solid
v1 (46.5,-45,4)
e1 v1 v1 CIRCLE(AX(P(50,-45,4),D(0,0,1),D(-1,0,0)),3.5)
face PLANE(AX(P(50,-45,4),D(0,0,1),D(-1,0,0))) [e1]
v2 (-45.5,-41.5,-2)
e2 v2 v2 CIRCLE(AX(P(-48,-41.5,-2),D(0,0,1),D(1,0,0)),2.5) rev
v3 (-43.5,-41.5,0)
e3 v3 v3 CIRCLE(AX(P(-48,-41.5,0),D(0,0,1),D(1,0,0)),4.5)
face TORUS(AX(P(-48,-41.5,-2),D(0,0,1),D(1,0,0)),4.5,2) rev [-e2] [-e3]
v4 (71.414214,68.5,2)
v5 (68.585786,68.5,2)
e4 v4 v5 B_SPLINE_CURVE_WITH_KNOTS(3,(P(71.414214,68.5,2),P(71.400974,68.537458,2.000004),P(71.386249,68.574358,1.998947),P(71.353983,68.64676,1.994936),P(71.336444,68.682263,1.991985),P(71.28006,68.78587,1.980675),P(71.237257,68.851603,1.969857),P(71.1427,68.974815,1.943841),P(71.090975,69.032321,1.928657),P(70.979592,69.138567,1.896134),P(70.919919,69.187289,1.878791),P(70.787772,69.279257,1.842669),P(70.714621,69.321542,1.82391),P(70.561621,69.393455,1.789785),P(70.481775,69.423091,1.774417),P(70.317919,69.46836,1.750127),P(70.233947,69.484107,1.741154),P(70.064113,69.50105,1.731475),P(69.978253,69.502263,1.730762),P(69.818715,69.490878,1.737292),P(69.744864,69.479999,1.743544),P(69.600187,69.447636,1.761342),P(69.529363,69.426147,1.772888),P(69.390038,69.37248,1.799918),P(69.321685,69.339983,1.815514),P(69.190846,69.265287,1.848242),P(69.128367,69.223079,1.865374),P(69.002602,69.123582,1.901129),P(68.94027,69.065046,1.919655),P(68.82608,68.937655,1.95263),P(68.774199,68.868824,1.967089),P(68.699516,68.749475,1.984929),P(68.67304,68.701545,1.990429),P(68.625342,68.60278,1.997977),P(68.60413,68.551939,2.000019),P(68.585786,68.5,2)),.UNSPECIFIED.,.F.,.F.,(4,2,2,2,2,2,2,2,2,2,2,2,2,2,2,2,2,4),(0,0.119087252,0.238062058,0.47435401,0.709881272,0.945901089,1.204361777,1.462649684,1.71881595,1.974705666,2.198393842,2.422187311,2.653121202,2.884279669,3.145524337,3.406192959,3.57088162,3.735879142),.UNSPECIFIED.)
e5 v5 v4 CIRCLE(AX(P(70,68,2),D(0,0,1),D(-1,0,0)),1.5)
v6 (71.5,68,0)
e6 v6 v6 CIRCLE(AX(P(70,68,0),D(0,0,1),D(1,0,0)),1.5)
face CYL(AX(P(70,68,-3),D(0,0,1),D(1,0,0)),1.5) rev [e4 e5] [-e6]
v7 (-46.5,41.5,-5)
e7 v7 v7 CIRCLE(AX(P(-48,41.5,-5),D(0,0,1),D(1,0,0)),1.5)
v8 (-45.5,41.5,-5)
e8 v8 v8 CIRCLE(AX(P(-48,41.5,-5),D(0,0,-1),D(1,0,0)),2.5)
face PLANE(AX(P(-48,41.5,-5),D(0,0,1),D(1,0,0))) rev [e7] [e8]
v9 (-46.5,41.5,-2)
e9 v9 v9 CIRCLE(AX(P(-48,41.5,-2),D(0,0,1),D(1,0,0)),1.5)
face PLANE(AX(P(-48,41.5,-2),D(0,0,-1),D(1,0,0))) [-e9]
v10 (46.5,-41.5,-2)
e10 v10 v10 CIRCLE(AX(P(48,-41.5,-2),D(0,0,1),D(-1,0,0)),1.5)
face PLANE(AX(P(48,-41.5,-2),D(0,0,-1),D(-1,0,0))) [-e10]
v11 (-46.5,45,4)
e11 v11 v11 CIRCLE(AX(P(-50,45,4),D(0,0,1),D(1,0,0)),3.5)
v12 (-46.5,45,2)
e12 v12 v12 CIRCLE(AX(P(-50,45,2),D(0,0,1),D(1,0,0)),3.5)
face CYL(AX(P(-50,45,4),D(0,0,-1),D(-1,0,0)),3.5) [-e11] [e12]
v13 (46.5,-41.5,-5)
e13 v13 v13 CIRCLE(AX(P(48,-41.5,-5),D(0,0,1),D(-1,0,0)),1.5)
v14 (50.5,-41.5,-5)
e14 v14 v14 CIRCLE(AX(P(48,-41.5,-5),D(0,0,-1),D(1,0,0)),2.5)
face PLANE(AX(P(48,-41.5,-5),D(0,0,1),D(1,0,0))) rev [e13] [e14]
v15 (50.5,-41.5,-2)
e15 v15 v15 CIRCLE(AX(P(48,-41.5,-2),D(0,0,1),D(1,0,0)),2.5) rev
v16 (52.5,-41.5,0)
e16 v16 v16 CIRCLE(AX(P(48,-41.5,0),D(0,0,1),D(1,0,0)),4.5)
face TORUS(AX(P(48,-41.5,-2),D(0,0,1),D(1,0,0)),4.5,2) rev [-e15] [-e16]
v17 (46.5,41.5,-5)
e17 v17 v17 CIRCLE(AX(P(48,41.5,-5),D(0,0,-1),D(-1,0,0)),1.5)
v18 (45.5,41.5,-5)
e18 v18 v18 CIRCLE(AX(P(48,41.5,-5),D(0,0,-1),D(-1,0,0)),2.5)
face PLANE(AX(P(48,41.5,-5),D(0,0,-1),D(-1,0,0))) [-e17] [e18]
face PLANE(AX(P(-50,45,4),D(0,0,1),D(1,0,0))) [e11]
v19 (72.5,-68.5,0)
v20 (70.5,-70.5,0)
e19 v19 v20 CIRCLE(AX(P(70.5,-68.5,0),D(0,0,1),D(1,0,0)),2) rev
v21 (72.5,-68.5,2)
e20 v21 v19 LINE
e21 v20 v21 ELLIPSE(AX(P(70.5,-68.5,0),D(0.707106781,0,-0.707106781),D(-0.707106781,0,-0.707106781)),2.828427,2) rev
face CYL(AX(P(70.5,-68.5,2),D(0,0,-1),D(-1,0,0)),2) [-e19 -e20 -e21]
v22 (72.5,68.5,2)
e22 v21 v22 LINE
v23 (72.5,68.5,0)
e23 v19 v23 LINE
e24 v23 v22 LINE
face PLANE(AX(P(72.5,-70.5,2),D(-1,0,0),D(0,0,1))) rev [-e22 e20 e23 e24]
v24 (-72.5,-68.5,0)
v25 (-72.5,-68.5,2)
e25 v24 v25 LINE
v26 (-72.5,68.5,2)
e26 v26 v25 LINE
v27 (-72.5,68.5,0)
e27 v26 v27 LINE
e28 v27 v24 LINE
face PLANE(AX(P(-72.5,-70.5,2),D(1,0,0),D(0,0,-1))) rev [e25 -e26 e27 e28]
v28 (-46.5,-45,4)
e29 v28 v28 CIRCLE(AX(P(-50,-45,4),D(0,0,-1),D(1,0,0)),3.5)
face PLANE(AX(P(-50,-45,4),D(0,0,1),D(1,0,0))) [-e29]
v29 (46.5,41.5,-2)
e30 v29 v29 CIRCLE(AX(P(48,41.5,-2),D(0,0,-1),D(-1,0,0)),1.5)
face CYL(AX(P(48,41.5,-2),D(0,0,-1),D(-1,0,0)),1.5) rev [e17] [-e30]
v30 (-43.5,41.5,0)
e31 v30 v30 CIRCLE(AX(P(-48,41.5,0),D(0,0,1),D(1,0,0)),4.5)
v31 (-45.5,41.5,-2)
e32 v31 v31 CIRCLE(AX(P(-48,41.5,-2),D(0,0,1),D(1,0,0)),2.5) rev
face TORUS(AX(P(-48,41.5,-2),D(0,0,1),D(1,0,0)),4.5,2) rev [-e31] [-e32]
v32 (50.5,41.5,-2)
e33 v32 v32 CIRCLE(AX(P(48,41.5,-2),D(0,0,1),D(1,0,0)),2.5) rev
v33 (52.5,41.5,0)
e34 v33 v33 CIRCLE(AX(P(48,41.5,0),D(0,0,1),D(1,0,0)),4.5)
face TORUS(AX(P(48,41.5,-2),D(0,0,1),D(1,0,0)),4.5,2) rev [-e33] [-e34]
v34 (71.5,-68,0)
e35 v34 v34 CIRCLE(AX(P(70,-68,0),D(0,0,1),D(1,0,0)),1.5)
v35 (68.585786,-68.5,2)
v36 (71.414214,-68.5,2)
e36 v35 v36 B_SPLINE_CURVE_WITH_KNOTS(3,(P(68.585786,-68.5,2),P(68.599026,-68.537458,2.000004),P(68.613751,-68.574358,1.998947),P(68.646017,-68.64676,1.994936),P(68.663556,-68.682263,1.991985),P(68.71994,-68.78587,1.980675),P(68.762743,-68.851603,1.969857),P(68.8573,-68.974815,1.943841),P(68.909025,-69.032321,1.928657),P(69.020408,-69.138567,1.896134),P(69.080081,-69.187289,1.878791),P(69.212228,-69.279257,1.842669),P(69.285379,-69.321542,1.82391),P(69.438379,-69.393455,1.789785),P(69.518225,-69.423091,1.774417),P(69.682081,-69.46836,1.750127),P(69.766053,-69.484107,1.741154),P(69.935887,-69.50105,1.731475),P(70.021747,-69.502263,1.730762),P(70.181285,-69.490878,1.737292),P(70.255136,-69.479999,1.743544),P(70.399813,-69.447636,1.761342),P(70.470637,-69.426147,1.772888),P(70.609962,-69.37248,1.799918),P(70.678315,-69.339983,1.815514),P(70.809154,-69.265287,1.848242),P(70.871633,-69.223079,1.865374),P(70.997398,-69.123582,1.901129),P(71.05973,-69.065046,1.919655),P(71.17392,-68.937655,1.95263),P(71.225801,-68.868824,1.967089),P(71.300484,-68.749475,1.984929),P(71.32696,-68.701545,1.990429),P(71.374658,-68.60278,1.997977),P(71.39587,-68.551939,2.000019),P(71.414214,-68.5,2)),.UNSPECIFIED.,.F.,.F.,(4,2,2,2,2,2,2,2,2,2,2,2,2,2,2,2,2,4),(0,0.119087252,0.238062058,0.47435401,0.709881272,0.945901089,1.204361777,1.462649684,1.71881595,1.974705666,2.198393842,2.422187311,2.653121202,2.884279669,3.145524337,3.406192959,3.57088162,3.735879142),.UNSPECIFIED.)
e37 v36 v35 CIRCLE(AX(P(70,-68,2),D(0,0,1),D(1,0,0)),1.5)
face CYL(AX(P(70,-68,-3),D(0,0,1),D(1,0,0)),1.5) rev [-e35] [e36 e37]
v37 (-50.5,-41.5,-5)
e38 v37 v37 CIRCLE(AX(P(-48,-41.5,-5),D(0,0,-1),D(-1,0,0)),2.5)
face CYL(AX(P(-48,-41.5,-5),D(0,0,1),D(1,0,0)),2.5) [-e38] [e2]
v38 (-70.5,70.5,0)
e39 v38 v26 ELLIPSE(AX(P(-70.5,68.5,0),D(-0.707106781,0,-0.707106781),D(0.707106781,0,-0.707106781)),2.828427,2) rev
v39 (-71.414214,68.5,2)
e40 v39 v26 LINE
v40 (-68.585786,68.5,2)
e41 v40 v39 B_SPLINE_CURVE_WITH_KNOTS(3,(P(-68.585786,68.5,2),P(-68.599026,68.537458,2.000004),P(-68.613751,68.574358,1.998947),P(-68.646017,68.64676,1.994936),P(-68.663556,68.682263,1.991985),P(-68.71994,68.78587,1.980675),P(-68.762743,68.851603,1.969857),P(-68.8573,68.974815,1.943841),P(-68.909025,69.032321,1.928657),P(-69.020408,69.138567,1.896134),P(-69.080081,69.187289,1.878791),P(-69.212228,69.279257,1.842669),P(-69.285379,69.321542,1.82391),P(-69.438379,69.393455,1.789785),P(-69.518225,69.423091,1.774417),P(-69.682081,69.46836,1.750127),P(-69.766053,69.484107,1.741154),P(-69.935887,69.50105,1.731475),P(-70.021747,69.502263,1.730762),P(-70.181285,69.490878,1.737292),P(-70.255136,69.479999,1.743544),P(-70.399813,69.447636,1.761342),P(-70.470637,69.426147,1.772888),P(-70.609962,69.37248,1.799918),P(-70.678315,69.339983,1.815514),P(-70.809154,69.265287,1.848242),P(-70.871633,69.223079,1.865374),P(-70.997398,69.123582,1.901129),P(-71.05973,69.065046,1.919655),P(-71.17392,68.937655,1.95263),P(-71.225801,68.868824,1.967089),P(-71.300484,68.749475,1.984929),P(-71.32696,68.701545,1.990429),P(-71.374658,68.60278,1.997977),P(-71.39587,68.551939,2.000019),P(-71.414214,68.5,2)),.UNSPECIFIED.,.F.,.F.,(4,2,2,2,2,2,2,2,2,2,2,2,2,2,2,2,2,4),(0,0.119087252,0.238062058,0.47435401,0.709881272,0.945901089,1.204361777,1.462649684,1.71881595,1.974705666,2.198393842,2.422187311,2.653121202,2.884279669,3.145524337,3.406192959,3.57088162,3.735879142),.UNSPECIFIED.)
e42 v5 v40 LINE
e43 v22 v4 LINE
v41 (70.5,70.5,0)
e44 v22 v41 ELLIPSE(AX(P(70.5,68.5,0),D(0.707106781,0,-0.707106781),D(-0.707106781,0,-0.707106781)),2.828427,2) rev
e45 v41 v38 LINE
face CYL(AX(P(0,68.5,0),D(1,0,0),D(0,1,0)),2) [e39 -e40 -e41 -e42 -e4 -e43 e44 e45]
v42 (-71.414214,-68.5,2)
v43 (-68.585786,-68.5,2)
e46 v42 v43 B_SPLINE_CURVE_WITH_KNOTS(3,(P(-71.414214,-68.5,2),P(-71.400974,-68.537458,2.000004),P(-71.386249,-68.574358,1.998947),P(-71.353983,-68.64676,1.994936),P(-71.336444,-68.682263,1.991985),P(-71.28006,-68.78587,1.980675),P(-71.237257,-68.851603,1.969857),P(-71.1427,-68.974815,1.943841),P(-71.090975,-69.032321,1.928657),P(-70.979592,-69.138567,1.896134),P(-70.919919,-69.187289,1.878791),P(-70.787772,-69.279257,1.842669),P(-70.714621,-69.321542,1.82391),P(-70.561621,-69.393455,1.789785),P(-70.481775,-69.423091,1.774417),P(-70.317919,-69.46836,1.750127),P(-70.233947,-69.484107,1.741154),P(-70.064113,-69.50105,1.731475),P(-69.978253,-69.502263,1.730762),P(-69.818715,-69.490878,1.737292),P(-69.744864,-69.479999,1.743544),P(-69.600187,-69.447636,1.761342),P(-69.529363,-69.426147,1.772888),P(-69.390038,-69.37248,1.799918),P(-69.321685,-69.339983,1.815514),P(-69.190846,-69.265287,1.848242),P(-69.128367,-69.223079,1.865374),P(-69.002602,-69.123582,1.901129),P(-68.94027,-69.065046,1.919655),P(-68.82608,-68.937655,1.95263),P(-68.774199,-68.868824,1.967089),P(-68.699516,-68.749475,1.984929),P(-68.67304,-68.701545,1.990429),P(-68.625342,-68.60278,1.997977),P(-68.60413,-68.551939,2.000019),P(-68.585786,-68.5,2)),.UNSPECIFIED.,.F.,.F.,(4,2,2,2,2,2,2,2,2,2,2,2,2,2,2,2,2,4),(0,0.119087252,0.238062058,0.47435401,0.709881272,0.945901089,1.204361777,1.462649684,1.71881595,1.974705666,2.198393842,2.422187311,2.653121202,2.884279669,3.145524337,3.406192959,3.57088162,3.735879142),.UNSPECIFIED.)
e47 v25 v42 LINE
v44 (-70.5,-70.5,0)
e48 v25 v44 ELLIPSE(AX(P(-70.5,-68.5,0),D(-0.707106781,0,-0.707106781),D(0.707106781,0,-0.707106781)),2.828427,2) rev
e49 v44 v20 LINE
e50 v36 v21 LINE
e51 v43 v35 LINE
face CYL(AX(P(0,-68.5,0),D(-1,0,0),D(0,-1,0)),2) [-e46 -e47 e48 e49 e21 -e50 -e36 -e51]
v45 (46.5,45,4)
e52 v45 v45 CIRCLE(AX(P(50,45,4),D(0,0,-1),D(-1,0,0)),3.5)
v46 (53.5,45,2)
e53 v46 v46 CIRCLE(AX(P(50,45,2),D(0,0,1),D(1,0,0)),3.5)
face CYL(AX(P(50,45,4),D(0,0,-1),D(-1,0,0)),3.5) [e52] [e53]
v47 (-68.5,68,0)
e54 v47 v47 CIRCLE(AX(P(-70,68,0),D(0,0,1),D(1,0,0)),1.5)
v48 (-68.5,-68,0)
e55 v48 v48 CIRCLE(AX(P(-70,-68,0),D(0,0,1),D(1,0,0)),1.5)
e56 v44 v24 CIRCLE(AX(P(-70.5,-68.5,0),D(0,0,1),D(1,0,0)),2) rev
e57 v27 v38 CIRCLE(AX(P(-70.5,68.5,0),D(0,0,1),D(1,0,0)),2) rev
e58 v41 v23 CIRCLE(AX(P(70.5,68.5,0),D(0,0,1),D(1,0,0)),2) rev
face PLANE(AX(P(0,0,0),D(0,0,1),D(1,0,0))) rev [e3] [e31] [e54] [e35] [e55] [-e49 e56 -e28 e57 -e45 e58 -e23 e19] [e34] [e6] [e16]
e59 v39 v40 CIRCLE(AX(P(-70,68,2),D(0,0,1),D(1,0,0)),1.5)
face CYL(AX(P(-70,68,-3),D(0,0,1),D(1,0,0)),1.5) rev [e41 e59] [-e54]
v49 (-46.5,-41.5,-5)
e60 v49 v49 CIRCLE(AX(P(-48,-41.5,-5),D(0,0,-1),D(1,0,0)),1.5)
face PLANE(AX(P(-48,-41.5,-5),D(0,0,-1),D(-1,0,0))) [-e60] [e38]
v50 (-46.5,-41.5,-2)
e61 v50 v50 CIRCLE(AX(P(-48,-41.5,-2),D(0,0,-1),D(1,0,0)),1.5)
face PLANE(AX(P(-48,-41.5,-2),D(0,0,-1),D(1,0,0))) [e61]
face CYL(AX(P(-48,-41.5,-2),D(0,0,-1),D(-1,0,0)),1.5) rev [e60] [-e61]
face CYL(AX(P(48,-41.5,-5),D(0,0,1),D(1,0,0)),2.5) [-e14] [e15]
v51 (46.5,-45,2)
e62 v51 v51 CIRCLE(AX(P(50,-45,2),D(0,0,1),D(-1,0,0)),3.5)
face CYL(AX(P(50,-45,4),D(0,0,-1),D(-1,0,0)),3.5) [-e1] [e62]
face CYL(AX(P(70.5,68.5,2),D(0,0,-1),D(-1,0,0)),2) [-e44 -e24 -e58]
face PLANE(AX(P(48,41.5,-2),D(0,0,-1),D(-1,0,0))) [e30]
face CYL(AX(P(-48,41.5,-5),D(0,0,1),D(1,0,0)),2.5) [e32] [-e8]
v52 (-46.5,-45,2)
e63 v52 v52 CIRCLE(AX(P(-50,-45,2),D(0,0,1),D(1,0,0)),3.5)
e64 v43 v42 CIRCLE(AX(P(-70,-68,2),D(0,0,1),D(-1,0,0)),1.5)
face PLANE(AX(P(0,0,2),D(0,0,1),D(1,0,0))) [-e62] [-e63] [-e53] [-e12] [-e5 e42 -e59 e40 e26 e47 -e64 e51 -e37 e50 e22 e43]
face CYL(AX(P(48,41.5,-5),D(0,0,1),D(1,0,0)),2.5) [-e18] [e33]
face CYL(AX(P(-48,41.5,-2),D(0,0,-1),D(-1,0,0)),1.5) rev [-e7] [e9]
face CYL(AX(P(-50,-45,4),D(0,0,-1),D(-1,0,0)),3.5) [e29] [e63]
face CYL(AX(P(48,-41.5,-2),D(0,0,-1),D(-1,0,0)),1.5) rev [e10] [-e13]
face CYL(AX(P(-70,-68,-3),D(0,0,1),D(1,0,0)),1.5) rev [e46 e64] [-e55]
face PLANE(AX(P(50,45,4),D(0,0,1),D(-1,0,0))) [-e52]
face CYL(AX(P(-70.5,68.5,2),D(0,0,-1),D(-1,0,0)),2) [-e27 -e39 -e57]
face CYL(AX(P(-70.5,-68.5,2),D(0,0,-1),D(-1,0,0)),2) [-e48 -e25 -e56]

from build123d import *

# Parameters (mm, degrees)
SKETCH1_W                                  = 145
SKETCH1_H                                  = 141
BOSS_EXTRUDE1_DEPTH                        = 2
SKETCH2_R                                  = 1.5
CUT_EXTRUDE1_DEPTH                         = 5
FILLET1_R                                  = 2
SKETCH3_R                                  = 2.5
BOSS_EXTRUDE2_DEPTH                        = 5
FILLET2_R                                  = 2
SKETCH4_R                                  = 1.5
CUT_EXTRUDE2_DEPTH                         = 3
MIRROR1_AT_THE_SECOND_PLANE_COPY_1_SKETC_R = 1.5
MIRROR1_AT_THE_SECOND_PLANE_COPY_1_DEPTH   = 3
SKETCH5_R                                  = 3.5
BOSS_EXTRUDE3_DEPTH                        = 2
MIRROR2_AT_THE_SECOND_PLANE_COPY_1_SKETC_R = 3.5
MIRROR2_AT_THE_SECOND_PLANE_COPY_1_DEPTH   = 2


with BuildPart() as part:
    # Sketch1 → Boss-Extrude1 (new body)
    with BuildSketch(Plane.XY):
        Rectangle(SKETCH1_W, SKETCH1_H)
    extrude(amount=BOSS_EXTRUDE1_DEPTH)

    # Sketch2 → Cut-Extrude1 (cut)
    with BuildSketch(Plane.XY.offset(2)):
        with Locations((-70, 68)):
            Circle(SKETCH2_R)
        with Locations((-70, -68)):
            Circle(SKETCH2_R)
        with Locations((70, -68)):
            Circle(SKETCH2_R)
        with Locations((70, 68)):
            Circle(SKETCH2_R)
    extrude(amount=-CUT_EXTRUDE1_DEPTH, mode=Mode.SUBTRACT)

    # Fillet1
    # the kernel refuses this fillet: 2 mm, written as the material it takes off along each edge
    with BuildSketch(Plane(origin=(-77.5, 70.5, 2), x_dir=(0, -1, 0), z_dir=(1, 0, 0))) as fillet1_piece_1:
        with BuildLine():
            CenterArc((FILLET1_R, FILLET1_R), FILLET1_R, 180, 90)
            Line((0, FILLET1_R), (0, 0))
            Line((0, 0), (FILLET1_R, 0))
        make_face()
    extrude(amount=155, mode=Mode.SUBTRACT)
    with BuildSketch(Plane(origin=(-72.5, 70.5, -5), x_dir=(0, -1, 0), z_dir=(0, 0, 1)), Plane(origin=(-72.5, -70.5, -5), x_dir=(1, 0, 0), z_dir=(0, 0, 1))) as fillet1_piece_2:
        with BuildLine():
            CenterArc((FILLET1_R, FILLET1_R), FILLET1_R, 180, 90)
            Line((0, FILLET1_R), (0, 0))
            Line((0, 0), (FILLET1_R, 0))
        make_face()
    extrude(amount=12, mode=Mode.SUBTRACT)
    with BuildSketch(Plane(origin=(72.5, 70.5, -5), x_dir=(0, -1, 0), z_dir=(0, 0, 1)), Plane(origin=(72.5, -70.5, -5), x_dir=(-1, 0, 0), z_dir=(0, 0, 1))) as fillet1_piece_3:
        with BuildLine():
            CenterArc((FILLET1_R, -FILLET1_R), FILLET1_R, 90, 90)
            Line((0, -FILLET1_R), (0, 0))
            Line((0, 0), (FILLET1_R, 0))
        make_face()
    extrude(amount=12, mode=Mode.SUBTRACT)
    with BuildSketch(Plane(origin=(77.5, -70.5, 2), x_dir=(0, 0, -1), z_dir=(-1, 0, 0))) as fillet1_piece_4:
        with BuildLine():
            CenterArc((FILLET1_R, -FILLET1_R), FILLET1_R, 90, 90)
            Line((0, -FILLET1_R), (0, 0))
            Line((0, 0), (FILLET1_R, 0))
        make_face()
    extrude(amount=155, mode=Mode.SUBTRACT)

    # Sketch3 → Boss-Extrude2 (add)
    with BuildSketch(Plane(origin=(0, 0, 0), x_dir=(-1, 0, 0), z_dir=(0, 0, -1))):
        with Locations(Location((-48, 41.5, 0), (0, 0, 180))):
            Circle(SKETCH3_R)
        with Locations(Location((-48, -41.5, 0), (0, 0, 180))):
            Circle(SKETCH3_R)
        with Locations(Location((48, -41.5, 0), (0, 0, 180))):
            Circle(SKETCH3_R)
        with Locations(Location((48, 41.5, 0), (0, 0, 180))):
            Circle(SKETCH3_R)
    extrude(amount=BOSS_EXTRUDE2_DEPTH)

    # Fillet2
    fillet2_edges = [part.edges().sort_by_distance(p)[0] for p in [
        (45.5, 41.5, 0),
        (45.5, -41.5, 0),
        (-50.5, -41.5, 0),
        (-50.5, 41.5, 0),
    ]]
    fillet(fillet2_edges, radius=FILLET2_R)

    # Sketch4 → Cut-Extrude2 (cut)
    with BuildSketch(Plane(origin=(0, 0, -5), x_dir=(-1, 0, 0), z_dir=(0, 0, -1))):
        with Locations((-48, 41.5)):
            Circle(SKETCH4_R)
    cut_extrude2 = extrude(amount=-CUT_EXTRUDE2_DEPTH, mode=Mode.SUBTRACT)

    # Mirror1: Cut-Extrude2 across plane
    add(cut_extrude2.mirror(Plane(origin=(0, 0, 0), x_dir=(0, 0, 1), z_dir=(1, 0, 0))), mode=Mode.SUBTRACT)

    # Mirror1 at the second plane: Cut-Extrude2 across plane
    add(cut_extrude2.mirror(Plane.ZX), mode=Mode.SUBTRACT)

    # Mirror1 at the second plane copy 1 sketc → Mirror1 at the second plane copy 1 (cut)
    with BuildSketch(Plane(origin=(0, 0, -5), x_dir=(1, 0, 0), z_dir=(0, 0, -1))):
        with Locations((-48, 41.5)):
            Circle(MIRROR1_AT_THE_SECOND_PLANE_COPY_1_SKETC_R)
    extrude(amount=-MIRROR1_AT_THE_SECOND_PLANE_COPY_1_DEPTH, mode=Mode.SUBTRACT)

    # Sketch5 → Boss-Extrude3 (add)
    with BuildSketch(Plane.XY.offset(2)):
        with Locations((-50, 45)):
            Circle(SKETCH5_R)
    boss_extrude3 = extrude(amount=BOSS_EXTRUDE3_DEPTH)

    # Mirror2: Boss-Extrude3 across plane
    add(boss_extrude3.mirror(Plane(origin=(0, 0, 0), x_dir=(0, 0, 1), z_dir=(1, 0, 0))))

    # Mirror2 at the second plane: Boss-Extrude3 across plane
    add(boss_extrude3.mirror(Plane.ZX))

    # Mirror2 at the second plane copy 1 sketc → Mirror2 at the second plane copy 1 (add)
    with BuildSketch(Plane(origin=(0, 0, 2), x_dir=(-1, 0, 0), z_dir=(0, 0, 1))):
        with Locations((-50, 45)):
            Circle(MIRROR2_AT_THE_SECOND_PLANE_COPY_1_SKETC_R)
    extrude(amount=MIRROR2_AT_THE_SECOND_PLANE_COPY_1_DEPTH)


solid = part.part
